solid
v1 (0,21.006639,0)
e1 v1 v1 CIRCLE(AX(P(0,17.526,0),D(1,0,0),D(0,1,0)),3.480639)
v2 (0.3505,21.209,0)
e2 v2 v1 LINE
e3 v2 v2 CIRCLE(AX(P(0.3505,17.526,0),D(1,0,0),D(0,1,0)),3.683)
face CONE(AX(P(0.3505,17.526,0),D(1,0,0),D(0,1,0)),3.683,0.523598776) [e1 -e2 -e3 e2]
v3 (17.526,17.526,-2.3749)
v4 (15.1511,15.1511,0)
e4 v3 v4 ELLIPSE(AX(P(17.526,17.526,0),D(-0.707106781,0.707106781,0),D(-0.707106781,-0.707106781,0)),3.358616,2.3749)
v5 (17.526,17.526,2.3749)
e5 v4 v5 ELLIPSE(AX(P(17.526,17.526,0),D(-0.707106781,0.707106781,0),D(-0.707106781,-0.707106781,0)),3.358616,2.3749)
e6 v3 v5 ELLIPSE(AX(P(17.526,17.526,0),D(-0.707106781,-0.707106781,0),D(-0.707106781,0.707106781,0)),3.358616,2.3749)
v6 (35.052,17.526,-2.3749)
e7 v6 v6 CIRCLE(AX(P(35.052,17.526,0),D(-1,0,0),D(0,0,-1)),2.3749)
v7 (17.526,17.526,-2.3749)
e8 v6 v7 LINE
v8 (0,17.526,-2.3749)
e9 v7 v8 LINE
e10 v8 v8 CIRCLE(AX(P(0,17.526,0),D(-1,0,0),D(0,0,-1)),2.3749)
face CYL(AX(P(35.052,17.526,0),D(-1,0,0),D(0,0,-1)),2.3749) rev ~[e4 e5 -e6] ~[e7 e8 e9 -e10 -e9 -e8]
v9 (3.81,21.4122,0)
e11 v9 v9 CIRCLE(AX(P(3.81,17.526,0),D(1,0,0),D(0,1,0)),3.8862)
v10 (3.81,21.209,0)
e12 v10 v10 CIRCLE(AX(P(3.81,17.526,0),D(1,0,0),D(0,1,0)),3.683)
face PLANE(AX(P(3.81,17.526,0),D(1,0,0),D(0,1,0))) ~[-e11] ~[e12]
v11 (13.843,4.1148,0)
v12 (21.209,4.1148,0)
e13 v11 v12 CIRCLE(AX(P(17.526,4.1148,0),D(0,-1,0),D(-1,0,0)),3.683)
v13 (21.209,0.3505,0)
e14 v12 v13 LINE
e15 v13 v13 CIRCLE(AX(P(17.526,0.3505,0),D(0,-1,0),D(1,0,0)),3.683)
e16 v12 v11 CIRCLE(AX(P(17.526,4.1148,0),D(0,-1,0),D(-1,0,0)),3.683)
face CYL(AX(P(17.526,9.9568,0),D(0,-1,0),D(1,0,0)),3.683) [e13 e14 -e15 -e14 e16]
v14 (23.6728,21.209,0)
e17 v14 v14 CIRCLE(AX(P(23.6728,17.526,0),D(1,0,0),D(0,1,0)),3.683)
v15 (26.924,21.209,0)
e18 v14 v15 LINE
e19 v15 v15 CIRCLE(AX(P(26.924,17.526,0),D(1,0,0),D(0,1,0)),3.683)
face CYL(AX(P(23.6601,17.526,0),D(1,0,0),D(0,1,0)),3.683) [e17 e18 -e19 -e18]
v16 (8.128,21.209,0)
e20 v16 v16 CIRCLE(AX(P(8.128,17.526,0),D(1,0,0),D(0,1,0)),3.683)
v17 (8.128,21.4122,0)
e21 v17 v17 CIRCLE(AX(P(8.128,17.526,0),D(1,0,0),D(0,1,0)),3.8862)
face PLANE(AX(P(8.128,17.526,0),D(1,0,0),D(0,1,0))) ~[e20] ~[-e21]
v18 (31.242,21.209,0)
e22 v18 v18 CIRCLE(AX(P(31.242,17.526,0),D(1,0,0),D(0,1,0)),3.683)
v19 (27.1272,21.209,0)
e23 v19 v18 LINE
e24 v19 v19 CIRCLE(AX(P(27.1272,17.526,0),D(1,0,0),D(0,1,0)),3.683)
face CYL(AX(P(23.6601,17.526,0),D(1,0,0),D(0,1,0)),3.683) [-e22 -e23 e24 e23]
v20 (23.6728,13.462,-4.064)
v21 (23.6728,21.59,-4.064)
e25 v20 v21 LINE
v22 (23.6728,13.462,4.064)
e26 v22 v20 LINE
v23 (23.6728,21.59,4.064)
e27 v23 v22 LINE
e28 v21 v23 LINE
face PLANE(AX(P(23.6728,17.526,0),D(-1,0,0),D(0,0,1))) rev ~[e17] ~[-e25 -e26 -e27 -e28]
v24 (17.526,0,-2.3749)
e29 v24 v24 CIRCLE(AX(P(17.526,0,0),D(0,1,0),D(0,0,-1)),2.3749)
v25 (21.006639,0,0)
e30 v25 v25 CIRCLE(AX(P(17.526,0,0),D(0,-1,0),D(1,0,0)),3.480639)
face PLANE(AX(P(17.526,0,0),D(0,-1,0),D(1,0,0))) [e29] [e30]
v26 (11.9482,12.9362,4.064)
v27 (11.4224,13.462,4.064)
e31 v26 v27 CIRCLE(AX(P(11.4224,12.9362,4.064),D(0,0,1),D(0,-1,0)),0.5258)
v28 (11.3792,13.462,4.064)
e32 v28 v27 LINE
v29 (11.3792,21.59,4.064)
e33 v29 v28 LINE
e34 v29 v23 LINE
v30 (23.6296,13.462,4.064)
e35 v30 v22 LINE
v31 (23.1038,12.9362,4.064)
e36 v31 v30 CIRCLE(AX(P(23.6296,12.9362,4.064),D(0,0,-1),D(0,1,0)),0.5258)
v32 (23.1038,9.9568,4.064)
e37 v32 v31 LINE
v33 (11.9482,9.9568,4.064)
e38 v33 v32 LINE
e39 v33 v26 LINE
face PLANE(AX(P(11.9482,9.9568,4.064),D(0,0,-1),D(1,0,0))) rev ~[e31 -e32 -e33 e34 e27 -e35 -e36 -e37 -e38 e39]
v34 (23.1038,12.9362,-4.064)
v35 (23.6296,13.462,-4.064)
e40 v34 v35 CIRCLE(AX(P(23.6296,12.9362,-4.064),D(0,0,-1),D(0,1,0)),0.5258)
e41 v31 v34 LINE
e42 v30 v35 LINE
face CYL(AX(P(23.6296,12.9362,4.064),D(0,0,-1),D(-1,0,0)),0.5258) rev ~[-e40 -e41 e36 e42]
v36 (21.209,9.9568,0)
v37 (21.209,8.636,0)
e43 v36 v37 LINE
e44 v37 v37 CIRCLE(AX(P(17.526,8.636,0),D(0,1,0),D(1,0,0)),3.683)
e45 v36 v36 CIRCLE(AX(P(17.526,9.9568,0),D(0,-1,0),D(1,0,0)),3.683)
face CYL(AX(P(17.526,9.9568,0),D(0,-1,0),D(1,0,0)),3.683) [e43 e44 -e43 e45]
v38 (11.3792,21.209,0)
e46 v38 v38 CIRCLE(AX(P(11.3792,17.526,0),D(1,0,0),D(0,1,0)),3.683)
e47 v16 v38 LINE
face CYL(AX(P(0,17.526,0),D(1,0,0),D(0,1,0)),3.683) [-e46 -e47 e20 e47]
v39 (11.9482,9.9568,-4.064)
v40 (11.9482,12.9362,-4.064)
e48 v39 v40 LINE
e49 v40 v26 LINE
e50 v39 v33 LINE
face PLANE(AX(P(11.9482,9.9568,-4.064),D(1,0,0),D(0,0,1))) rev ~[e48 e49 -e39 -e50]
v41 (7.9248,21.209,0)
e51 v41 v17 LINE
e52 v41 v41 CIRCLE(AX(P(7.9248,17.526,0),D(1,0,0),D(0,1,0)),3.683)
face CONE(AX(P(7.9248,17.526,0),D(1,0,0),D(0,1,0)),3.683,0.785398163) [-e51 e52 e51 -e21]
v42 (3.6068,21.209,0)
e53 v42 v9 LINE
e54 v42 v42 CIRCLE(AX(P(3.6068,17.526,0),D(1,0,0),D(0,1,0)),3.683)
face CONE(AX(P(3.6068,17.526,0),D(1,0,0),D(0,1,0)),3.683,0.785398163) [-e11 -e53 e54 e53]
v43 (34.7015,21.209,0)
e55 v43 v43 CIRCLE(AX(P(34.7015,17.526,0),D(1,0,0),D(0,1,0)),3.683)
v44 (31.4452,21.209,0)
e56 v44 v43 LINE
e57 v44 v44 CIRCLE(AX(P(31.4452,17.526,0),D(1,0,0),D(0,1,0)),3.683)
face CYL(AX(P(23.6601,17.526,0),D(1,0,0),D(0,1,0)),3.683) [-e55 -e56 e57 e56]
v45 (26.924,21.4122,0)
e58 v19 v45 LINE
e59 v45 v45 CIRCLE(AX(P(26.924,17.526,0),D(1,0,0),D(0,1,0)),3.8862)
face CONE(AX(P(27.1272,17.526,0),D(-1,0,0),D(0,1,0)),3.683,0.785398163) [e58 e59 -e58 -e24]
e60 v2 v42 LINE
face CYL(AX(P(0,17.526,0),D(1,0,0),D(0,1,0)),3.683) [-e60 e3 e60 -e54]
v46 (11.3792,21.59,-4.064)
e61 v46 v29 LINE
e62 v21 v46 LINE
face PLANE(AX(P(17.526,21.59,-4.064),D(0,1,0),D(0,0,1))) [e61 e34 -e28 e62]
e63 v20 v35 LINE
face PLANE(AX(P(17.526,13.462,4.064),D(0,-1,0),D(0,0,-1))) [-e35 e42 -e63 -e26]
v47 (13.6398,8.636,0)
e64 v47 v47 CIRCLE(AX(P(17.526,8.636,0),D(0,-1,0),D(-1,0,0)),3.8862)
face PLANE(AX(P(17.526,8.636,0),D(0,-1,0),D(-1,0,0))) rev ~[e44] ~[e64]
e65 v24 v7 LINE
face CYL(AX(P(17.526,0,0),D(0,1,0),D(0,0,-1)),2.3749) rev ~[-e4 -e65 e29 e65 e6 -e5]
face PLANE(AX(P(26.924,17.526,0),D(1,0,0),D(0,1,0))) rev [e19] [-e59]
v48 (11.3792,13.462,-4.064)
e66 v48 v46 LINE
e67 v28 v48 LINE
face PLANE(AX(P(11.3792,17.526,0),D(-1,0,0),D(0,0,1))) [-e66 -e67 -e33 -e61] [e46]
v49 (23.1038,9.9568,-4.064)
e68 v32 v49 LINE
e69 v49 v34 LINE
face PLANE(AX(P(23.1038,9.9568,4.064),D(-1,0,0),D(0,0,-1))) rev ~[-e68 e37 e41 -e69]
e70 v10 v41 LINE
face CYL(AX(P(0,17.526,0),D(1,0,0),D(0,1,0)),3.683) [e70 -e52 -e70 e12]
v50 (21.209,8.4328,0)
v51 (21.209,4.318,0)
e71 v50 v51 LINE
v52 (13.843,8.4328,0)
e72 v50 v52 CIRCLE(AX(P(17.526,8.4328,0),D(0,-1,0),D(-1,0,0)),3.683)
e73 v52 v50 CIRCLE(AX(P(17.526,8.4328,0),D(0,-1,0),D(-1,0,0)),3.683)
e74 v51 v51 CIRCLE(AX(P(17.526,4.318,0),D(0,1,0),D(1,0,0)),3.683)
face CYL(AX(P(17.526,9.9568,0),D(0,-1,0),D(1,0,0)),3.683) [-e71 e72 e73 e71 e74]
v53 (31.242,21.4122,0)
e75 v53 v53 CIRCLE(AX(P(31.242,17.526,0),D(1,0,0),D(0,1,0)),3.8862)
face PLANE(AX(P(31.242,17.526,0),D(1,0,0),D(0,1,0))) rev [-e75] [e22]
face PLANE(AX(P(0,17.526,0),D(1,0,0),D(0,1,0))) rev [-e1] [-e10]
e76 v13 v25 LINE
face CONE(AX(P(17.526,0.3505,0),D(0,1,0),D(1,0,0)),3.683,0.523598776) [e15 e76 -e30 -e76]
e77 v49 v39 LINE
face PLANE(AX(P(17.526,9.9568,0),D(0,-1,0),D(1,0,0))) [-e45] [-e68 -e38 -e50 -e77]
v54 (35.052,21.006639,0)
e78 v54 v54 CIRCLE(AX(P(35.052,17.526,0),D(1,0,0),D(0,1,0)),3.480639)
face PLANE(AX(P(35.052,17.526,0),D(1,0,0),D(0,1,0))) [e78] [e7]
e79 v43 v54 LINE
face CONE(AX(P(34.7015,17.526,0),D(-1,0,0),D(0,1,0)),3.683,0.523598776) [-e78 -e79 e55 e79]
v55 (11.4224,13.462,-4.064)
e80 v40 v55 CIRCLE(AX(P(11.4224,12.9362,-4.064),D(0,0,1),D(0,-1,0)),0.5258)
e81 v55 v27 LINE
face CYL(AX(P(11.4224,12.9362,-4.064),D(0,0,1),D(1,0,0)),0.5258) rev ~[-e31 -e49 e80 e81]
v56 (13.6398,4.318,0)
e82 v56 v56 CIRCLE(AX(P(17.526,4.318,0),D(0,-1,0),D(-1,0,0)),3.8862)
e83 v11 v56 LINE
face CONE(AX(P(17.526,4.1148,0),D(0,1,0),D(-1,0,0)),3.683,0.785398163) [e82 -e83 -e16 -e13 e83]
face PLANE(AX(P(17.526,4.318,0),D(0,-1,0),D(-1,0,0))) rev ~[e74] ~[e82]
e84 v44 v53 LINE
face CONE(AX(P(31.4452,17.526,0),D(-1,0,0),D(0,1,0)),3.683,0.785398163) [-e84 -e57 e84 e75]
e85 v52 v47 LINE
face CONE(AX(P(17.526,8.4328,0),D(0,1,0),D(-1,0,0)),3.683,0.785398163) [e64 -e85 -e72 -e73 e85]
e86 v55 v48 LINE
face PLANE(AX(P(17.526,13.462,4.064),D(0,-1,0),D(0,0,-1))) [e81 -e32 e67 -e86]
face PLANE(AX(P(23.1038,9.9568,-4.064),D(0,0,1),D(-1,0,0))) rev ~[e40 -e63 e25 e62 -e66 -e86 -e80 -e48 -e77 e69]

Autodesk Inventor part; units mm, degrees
ref_plane "YZ Plane" through (0, 0, 0) normal (1, 0, 0) x (0, 1, 0)
ref_plane "XZ Plane" through (0, 0, 0) normal (0, 1, 0) x (-1, 0, 0)
ref_plane "XY Plane" through (0, 0, 0) normal (0, 0, 1) x (1, 0, 0)
sketch "Sketch7" plane through (0, 0, 0) normal (0, 0, 1) x (1, 0, 0)
  line L0 (0, 21.209) -> (11.3919, 21.209)
  line L1 (11.3919, 21.209) -> (11.3919, 21.209)
  line L2 (11.3919, 21.209) -> (23.6601, 21.209)
  line L3 (23.6601, 21.209) -> (23.6601, 21.209)
  line L4 (23.6601, 21.209) -> (35.052, 21.209)
  line L5 (35.052, 21.209) -> (35.052, 17.526)
  line L6 (0, 17.526) -> (0, 21.209)
  line L7 (0, 17.526) -> (35.052, 17.526)
  line L8 (-6.2642, 17.526) -> (48.9647, 17.526)
  point P0 (0, 0)
  dimension "d57" = 17.526
  dimension "d58" = 7.366
  dimension "d59" = 35.052
  dimension "d60" = 12.2682
  dimension "d128" = 3.683
revolve "Revolution3" add sketch "Sketch7" angle 360 about axis through (-6.2642, 17.526, 0) along (1, 0, 0)
ref_plane "Work Plane3" through (17.526, 17.526, 0) normal (-1, 0, 0) x (0, 0, 1)
sketch "Sketch8" plane through (17.526, 17.526, 0) normal (-1, 0, 0) x (0, 0, 1)
  line L0 (-4.064, 4.064) -> (4.064, 4.064)
  line L1 (4.064, 4.064) -> (4.064, -4.064)
  line L2 (4.064, -4.064) -> (-4.064, -4.064)
  line L3 (-4.064, -4.064) -> (-4.064, 4.064)
  circle A0 centre (0, 0) radius 1.3335
  circle A1 centre (0, 0) radius 3.683 projected
  dimension "d119" = 8.128
  dimension "d121" = 8.128
  dimension "d129" = 4.064
  dimension "d130" = 4.064
extrude "Extrusion5" add sketch "Sketch8" against normal mid plane 12.2936 contours L0 L1 L2 L3 | A1
sketch "Sketch9" plane through (0, 0, 0) normal (0, 0, 1) x (1, 0, 0)
  line L0 (17.526, 15.4328) -> (17.526, -3.476)
  line L1 (11.3792, 13.462) -> (23.6728, 13.462) projected
  line L2 (17.526, 13.462) -> (21.2458, 13.462)
  line L3 (21.2458, 13.462) -> (21.2458, 9.9568)
  line L4 (21.2458, 9.9568) -> (21.209, 9.9568)
  line L5 (21.209, 9.9568) -> (21.209, 0)
  line L6 (21.209, 0) -> (17.526, 0)
  line L7 (17.526, 0) -> (17.526, 13.462)
  point P0 (0, 0)
  dimension "d65" = 17.526
  dimension "d66" = 7.366
  dimension "d67" = 7.4397
  dimension "d68" = 3.5052
revolve "Revolution4" add sketch "Sketch9" angle 360 about axis through (17.526, 15.4328, 0) along (0, -1, 0)
sketch "Sketch10" plane through (17.526, 9.9568, 0) normal (0, -1, 0) x (1, 0, 0)
  circle A0 centre (0, 0) radius 3.7198 projected
  line L0 (-5.5778, 4.064) -> (5.5778, 4.064)
  line L1 (5.5778, 4.064) -> (5.5778, -4.064)
  line L2 (5.5778, -4.064) -> (-5.5778, -4.064)
  line L3 (-5.5778, -4.064) -> (-5.5778, 4.064)
  line L4 (-6.1468, 4.064) -> (6.1468, 4.064) projected
  line L5 (-6.1468, -4.064) -> (6.1468, -4.064) projected
  line L6 (-17.526, -3.683) -> (-17.526, 3.683) projected
  line L7 (17.526, -3.683) -> (17.526, 3.683) projected
  dimension "d122" = 11.9482
  dimension "d123" = 11.9482
extrude "Extrusion6" add sketch "Sketch10" against normal up to surface (3.5052 mm away)
sketch "Sketch11" plane through (0, 0, 0) normal (0, 0, 1) x (1, 0, 0)
  line L0 (-6.2642, 17.526) -> (48.9647, 17.526) projected
  line L1 (0, 21.209) -> (11.3792, 21.209) projected
  line L2 (8.128, 21.209) -> (8.128, 21.4122)
  line L3 (8.128, 21.209) -> (7.9248, 21.209)
  line L4 (7.9248, 21.209) -> (8.128, 21.4122)
  line L5 (23.6728, 21.59) -> (23.6728, 13.462) projected
  line L6 (3.81, 21.209) -> (3.81, 21.4122)
  line L7 (3.81, 21.209) -> (3.6068, 21.209)
  line L8 (3.6068, 21.209) -> (3.81, 21.4122)
  line L9 (17.526, 15.4328) -> (17.526, -3.476) projected
  line L10 (26.924, 21.209) -> (26.924, 21.4122)
  line L11 (26.924, 21.209) -> (27.1272, 21.209)
  line L12 (27.1272, 21.209) -> (26.924, 21.4122)
  line L13 (31.242, 21.209) -> (31.242, 21.4122)
  line L14 (31.242, 21.209) -> (31.4452, 21.209)
  line L15 (31.4452, 21.209) -> (31.242, 21.4122)
  line L16 (0, 13.843) -> (0, 21.209) projected
  dimension "d75" = 45
  dimension "d114" = 0.2032
  dimension "d115" = 3.81
  dimension "d116" = 4.318
revolve "Revolution5" add sketch "Sketch11" angle 360 about axis through (-6.2642, 17.526, 0) along (1, 0, 0)
sketch "Sketch12" plane through (0, 0, 0) normal (0, 0, 1) x (1, 0, 0)
  line L0 (13.843, 8.4328) -> (13.843, 8.636)
  line L1 (13.843, 8.4328) -> (13.6398, 8.636)
  line L2 (13.6398, 8.636) -> (13.843, 8.636)
  line L3 (17.526, 15.4328) -> (17.526, -3.476) projected
  line L4 (13.843, 9.9568) -> (13.843, 0) projected
  line L5 (11.322, 7.2263) -> (14.078, 7.2263) projected
  line L6 (13.843, 4.1148) -> (13.843, 4.318)
  line L7 (13.843, 4.1148) -> (13.6398, 4.318)
  line L8 (13.6398, 4.318) -> (13.843, 4.318)
  line L9 (13.843, 0) -> (21.209, 0) projected
  dimension "d89" = 45
  dimension "d90" = 45
  dimension "d124" = 0.2032
  dimension "d125" = 4.318
  dimension "d126" = 4.318
revolve "Revolution6" add sketch "Sketch12" angle 360 about axis through (17.526, 15.4328, 0) along (0, -1, 0)
hole "Hole3" at (35.052, 17.526, 0) direction (-1, 0, 0) diameter 4.7498 end through all
hole "Hole4" at (17.526, 0, 0) direction (0, 1, 0) diameter 4.7498 depth 17.526 tip angle 118
chamfer "Chamfer3" distance 0.3505 angle 30 1 edges at (0, 13.843, 0) measured on face at (1.2023, 21.1613, -0.5908)
chamfer "Chamfer4" distance 0.3505 angle 30 1 edges at (35.052, 13.843, 0) measured on face at (32.6475, 21.1613, -0.5908)
chamfer "Chamfer5" distance 0.3505 angle 30 1 edges at (13.843, 0, 0) measured on face at (21.1971, 2.7432, 0.2964)
fillet "Fillet1" radius 0.5258 2 edges at (11.9482, 13.462, 0) (23.1038, 13.462, 0)
equation "\"d57\" = M"
equation "\"d58\" = D1"
equation "\"d59\" = L"
equation "\"d60\" = 0.35 * L"
equation "\"d128\" = 0.5 * D1"
equation "\"d119\" = W1"
equation "\"d121\" = W1"
equation "\"d129\" = 0.5 * W1"
equation "\"d130\" = 0.5 * W1"
equation "\"d63\" = L - 2 * L3"
equation "\"d65\" = M"
equation "\"d66\" = D1"
equation "\"d67\" = 1.01 * D1"
equation "\"d68\" = 0.285714 * d60"
equation "\"d122\" = 1.05 * L3"
equation "\"d123\" = 1.05 * L3"
equation "\"d70\" = d60"
equation "\"d114\" = D2"
equation "\"d115\" = L1"
equation "\"d116\" = L2"
equation "\"d124\" = D2"
equation "\"d125\" = L2"
equation "\"d126\" = L2"
equation "\"d95\" = D"
equation "\"d104\" = D"
equation "\"d109\" = M"
equation "\"d111\" = 0.01 * L"
equation "\"d112\" = 0.01 * L"
equation "\"d131\" = 0.01 * L"
equation "\"d132\" = 0.01 * L"
equation "\"d134\" = 0.01 * L"
equation "\"d135\" = 0.01 * L"
equation "\"d127\" = 0.015 * L"
equation "\"L\" = 35.052"
equation "\"M\" = 17.526"
equation "\"D\" = 4.7498"
equation "\"d61\" = 1.75 * D"
equation "\"d84\" = 25.4"
equation "\"d85\" = 1.5748"
equation "\"L1\" = 3.81"
equation "\"L2\" = 4.318"
equation "\"L3\" = 11.3792"
equation "\"D1\" = 7.366"
equation "\"D2\" = 0.2032"
equation "\"W1\" = 8.128"
equation "\"d117\" = -0.5 * L"
properties part number "Tubo en T de unión 224 de Parker 224-6" material "Latón, amarillo claro"
